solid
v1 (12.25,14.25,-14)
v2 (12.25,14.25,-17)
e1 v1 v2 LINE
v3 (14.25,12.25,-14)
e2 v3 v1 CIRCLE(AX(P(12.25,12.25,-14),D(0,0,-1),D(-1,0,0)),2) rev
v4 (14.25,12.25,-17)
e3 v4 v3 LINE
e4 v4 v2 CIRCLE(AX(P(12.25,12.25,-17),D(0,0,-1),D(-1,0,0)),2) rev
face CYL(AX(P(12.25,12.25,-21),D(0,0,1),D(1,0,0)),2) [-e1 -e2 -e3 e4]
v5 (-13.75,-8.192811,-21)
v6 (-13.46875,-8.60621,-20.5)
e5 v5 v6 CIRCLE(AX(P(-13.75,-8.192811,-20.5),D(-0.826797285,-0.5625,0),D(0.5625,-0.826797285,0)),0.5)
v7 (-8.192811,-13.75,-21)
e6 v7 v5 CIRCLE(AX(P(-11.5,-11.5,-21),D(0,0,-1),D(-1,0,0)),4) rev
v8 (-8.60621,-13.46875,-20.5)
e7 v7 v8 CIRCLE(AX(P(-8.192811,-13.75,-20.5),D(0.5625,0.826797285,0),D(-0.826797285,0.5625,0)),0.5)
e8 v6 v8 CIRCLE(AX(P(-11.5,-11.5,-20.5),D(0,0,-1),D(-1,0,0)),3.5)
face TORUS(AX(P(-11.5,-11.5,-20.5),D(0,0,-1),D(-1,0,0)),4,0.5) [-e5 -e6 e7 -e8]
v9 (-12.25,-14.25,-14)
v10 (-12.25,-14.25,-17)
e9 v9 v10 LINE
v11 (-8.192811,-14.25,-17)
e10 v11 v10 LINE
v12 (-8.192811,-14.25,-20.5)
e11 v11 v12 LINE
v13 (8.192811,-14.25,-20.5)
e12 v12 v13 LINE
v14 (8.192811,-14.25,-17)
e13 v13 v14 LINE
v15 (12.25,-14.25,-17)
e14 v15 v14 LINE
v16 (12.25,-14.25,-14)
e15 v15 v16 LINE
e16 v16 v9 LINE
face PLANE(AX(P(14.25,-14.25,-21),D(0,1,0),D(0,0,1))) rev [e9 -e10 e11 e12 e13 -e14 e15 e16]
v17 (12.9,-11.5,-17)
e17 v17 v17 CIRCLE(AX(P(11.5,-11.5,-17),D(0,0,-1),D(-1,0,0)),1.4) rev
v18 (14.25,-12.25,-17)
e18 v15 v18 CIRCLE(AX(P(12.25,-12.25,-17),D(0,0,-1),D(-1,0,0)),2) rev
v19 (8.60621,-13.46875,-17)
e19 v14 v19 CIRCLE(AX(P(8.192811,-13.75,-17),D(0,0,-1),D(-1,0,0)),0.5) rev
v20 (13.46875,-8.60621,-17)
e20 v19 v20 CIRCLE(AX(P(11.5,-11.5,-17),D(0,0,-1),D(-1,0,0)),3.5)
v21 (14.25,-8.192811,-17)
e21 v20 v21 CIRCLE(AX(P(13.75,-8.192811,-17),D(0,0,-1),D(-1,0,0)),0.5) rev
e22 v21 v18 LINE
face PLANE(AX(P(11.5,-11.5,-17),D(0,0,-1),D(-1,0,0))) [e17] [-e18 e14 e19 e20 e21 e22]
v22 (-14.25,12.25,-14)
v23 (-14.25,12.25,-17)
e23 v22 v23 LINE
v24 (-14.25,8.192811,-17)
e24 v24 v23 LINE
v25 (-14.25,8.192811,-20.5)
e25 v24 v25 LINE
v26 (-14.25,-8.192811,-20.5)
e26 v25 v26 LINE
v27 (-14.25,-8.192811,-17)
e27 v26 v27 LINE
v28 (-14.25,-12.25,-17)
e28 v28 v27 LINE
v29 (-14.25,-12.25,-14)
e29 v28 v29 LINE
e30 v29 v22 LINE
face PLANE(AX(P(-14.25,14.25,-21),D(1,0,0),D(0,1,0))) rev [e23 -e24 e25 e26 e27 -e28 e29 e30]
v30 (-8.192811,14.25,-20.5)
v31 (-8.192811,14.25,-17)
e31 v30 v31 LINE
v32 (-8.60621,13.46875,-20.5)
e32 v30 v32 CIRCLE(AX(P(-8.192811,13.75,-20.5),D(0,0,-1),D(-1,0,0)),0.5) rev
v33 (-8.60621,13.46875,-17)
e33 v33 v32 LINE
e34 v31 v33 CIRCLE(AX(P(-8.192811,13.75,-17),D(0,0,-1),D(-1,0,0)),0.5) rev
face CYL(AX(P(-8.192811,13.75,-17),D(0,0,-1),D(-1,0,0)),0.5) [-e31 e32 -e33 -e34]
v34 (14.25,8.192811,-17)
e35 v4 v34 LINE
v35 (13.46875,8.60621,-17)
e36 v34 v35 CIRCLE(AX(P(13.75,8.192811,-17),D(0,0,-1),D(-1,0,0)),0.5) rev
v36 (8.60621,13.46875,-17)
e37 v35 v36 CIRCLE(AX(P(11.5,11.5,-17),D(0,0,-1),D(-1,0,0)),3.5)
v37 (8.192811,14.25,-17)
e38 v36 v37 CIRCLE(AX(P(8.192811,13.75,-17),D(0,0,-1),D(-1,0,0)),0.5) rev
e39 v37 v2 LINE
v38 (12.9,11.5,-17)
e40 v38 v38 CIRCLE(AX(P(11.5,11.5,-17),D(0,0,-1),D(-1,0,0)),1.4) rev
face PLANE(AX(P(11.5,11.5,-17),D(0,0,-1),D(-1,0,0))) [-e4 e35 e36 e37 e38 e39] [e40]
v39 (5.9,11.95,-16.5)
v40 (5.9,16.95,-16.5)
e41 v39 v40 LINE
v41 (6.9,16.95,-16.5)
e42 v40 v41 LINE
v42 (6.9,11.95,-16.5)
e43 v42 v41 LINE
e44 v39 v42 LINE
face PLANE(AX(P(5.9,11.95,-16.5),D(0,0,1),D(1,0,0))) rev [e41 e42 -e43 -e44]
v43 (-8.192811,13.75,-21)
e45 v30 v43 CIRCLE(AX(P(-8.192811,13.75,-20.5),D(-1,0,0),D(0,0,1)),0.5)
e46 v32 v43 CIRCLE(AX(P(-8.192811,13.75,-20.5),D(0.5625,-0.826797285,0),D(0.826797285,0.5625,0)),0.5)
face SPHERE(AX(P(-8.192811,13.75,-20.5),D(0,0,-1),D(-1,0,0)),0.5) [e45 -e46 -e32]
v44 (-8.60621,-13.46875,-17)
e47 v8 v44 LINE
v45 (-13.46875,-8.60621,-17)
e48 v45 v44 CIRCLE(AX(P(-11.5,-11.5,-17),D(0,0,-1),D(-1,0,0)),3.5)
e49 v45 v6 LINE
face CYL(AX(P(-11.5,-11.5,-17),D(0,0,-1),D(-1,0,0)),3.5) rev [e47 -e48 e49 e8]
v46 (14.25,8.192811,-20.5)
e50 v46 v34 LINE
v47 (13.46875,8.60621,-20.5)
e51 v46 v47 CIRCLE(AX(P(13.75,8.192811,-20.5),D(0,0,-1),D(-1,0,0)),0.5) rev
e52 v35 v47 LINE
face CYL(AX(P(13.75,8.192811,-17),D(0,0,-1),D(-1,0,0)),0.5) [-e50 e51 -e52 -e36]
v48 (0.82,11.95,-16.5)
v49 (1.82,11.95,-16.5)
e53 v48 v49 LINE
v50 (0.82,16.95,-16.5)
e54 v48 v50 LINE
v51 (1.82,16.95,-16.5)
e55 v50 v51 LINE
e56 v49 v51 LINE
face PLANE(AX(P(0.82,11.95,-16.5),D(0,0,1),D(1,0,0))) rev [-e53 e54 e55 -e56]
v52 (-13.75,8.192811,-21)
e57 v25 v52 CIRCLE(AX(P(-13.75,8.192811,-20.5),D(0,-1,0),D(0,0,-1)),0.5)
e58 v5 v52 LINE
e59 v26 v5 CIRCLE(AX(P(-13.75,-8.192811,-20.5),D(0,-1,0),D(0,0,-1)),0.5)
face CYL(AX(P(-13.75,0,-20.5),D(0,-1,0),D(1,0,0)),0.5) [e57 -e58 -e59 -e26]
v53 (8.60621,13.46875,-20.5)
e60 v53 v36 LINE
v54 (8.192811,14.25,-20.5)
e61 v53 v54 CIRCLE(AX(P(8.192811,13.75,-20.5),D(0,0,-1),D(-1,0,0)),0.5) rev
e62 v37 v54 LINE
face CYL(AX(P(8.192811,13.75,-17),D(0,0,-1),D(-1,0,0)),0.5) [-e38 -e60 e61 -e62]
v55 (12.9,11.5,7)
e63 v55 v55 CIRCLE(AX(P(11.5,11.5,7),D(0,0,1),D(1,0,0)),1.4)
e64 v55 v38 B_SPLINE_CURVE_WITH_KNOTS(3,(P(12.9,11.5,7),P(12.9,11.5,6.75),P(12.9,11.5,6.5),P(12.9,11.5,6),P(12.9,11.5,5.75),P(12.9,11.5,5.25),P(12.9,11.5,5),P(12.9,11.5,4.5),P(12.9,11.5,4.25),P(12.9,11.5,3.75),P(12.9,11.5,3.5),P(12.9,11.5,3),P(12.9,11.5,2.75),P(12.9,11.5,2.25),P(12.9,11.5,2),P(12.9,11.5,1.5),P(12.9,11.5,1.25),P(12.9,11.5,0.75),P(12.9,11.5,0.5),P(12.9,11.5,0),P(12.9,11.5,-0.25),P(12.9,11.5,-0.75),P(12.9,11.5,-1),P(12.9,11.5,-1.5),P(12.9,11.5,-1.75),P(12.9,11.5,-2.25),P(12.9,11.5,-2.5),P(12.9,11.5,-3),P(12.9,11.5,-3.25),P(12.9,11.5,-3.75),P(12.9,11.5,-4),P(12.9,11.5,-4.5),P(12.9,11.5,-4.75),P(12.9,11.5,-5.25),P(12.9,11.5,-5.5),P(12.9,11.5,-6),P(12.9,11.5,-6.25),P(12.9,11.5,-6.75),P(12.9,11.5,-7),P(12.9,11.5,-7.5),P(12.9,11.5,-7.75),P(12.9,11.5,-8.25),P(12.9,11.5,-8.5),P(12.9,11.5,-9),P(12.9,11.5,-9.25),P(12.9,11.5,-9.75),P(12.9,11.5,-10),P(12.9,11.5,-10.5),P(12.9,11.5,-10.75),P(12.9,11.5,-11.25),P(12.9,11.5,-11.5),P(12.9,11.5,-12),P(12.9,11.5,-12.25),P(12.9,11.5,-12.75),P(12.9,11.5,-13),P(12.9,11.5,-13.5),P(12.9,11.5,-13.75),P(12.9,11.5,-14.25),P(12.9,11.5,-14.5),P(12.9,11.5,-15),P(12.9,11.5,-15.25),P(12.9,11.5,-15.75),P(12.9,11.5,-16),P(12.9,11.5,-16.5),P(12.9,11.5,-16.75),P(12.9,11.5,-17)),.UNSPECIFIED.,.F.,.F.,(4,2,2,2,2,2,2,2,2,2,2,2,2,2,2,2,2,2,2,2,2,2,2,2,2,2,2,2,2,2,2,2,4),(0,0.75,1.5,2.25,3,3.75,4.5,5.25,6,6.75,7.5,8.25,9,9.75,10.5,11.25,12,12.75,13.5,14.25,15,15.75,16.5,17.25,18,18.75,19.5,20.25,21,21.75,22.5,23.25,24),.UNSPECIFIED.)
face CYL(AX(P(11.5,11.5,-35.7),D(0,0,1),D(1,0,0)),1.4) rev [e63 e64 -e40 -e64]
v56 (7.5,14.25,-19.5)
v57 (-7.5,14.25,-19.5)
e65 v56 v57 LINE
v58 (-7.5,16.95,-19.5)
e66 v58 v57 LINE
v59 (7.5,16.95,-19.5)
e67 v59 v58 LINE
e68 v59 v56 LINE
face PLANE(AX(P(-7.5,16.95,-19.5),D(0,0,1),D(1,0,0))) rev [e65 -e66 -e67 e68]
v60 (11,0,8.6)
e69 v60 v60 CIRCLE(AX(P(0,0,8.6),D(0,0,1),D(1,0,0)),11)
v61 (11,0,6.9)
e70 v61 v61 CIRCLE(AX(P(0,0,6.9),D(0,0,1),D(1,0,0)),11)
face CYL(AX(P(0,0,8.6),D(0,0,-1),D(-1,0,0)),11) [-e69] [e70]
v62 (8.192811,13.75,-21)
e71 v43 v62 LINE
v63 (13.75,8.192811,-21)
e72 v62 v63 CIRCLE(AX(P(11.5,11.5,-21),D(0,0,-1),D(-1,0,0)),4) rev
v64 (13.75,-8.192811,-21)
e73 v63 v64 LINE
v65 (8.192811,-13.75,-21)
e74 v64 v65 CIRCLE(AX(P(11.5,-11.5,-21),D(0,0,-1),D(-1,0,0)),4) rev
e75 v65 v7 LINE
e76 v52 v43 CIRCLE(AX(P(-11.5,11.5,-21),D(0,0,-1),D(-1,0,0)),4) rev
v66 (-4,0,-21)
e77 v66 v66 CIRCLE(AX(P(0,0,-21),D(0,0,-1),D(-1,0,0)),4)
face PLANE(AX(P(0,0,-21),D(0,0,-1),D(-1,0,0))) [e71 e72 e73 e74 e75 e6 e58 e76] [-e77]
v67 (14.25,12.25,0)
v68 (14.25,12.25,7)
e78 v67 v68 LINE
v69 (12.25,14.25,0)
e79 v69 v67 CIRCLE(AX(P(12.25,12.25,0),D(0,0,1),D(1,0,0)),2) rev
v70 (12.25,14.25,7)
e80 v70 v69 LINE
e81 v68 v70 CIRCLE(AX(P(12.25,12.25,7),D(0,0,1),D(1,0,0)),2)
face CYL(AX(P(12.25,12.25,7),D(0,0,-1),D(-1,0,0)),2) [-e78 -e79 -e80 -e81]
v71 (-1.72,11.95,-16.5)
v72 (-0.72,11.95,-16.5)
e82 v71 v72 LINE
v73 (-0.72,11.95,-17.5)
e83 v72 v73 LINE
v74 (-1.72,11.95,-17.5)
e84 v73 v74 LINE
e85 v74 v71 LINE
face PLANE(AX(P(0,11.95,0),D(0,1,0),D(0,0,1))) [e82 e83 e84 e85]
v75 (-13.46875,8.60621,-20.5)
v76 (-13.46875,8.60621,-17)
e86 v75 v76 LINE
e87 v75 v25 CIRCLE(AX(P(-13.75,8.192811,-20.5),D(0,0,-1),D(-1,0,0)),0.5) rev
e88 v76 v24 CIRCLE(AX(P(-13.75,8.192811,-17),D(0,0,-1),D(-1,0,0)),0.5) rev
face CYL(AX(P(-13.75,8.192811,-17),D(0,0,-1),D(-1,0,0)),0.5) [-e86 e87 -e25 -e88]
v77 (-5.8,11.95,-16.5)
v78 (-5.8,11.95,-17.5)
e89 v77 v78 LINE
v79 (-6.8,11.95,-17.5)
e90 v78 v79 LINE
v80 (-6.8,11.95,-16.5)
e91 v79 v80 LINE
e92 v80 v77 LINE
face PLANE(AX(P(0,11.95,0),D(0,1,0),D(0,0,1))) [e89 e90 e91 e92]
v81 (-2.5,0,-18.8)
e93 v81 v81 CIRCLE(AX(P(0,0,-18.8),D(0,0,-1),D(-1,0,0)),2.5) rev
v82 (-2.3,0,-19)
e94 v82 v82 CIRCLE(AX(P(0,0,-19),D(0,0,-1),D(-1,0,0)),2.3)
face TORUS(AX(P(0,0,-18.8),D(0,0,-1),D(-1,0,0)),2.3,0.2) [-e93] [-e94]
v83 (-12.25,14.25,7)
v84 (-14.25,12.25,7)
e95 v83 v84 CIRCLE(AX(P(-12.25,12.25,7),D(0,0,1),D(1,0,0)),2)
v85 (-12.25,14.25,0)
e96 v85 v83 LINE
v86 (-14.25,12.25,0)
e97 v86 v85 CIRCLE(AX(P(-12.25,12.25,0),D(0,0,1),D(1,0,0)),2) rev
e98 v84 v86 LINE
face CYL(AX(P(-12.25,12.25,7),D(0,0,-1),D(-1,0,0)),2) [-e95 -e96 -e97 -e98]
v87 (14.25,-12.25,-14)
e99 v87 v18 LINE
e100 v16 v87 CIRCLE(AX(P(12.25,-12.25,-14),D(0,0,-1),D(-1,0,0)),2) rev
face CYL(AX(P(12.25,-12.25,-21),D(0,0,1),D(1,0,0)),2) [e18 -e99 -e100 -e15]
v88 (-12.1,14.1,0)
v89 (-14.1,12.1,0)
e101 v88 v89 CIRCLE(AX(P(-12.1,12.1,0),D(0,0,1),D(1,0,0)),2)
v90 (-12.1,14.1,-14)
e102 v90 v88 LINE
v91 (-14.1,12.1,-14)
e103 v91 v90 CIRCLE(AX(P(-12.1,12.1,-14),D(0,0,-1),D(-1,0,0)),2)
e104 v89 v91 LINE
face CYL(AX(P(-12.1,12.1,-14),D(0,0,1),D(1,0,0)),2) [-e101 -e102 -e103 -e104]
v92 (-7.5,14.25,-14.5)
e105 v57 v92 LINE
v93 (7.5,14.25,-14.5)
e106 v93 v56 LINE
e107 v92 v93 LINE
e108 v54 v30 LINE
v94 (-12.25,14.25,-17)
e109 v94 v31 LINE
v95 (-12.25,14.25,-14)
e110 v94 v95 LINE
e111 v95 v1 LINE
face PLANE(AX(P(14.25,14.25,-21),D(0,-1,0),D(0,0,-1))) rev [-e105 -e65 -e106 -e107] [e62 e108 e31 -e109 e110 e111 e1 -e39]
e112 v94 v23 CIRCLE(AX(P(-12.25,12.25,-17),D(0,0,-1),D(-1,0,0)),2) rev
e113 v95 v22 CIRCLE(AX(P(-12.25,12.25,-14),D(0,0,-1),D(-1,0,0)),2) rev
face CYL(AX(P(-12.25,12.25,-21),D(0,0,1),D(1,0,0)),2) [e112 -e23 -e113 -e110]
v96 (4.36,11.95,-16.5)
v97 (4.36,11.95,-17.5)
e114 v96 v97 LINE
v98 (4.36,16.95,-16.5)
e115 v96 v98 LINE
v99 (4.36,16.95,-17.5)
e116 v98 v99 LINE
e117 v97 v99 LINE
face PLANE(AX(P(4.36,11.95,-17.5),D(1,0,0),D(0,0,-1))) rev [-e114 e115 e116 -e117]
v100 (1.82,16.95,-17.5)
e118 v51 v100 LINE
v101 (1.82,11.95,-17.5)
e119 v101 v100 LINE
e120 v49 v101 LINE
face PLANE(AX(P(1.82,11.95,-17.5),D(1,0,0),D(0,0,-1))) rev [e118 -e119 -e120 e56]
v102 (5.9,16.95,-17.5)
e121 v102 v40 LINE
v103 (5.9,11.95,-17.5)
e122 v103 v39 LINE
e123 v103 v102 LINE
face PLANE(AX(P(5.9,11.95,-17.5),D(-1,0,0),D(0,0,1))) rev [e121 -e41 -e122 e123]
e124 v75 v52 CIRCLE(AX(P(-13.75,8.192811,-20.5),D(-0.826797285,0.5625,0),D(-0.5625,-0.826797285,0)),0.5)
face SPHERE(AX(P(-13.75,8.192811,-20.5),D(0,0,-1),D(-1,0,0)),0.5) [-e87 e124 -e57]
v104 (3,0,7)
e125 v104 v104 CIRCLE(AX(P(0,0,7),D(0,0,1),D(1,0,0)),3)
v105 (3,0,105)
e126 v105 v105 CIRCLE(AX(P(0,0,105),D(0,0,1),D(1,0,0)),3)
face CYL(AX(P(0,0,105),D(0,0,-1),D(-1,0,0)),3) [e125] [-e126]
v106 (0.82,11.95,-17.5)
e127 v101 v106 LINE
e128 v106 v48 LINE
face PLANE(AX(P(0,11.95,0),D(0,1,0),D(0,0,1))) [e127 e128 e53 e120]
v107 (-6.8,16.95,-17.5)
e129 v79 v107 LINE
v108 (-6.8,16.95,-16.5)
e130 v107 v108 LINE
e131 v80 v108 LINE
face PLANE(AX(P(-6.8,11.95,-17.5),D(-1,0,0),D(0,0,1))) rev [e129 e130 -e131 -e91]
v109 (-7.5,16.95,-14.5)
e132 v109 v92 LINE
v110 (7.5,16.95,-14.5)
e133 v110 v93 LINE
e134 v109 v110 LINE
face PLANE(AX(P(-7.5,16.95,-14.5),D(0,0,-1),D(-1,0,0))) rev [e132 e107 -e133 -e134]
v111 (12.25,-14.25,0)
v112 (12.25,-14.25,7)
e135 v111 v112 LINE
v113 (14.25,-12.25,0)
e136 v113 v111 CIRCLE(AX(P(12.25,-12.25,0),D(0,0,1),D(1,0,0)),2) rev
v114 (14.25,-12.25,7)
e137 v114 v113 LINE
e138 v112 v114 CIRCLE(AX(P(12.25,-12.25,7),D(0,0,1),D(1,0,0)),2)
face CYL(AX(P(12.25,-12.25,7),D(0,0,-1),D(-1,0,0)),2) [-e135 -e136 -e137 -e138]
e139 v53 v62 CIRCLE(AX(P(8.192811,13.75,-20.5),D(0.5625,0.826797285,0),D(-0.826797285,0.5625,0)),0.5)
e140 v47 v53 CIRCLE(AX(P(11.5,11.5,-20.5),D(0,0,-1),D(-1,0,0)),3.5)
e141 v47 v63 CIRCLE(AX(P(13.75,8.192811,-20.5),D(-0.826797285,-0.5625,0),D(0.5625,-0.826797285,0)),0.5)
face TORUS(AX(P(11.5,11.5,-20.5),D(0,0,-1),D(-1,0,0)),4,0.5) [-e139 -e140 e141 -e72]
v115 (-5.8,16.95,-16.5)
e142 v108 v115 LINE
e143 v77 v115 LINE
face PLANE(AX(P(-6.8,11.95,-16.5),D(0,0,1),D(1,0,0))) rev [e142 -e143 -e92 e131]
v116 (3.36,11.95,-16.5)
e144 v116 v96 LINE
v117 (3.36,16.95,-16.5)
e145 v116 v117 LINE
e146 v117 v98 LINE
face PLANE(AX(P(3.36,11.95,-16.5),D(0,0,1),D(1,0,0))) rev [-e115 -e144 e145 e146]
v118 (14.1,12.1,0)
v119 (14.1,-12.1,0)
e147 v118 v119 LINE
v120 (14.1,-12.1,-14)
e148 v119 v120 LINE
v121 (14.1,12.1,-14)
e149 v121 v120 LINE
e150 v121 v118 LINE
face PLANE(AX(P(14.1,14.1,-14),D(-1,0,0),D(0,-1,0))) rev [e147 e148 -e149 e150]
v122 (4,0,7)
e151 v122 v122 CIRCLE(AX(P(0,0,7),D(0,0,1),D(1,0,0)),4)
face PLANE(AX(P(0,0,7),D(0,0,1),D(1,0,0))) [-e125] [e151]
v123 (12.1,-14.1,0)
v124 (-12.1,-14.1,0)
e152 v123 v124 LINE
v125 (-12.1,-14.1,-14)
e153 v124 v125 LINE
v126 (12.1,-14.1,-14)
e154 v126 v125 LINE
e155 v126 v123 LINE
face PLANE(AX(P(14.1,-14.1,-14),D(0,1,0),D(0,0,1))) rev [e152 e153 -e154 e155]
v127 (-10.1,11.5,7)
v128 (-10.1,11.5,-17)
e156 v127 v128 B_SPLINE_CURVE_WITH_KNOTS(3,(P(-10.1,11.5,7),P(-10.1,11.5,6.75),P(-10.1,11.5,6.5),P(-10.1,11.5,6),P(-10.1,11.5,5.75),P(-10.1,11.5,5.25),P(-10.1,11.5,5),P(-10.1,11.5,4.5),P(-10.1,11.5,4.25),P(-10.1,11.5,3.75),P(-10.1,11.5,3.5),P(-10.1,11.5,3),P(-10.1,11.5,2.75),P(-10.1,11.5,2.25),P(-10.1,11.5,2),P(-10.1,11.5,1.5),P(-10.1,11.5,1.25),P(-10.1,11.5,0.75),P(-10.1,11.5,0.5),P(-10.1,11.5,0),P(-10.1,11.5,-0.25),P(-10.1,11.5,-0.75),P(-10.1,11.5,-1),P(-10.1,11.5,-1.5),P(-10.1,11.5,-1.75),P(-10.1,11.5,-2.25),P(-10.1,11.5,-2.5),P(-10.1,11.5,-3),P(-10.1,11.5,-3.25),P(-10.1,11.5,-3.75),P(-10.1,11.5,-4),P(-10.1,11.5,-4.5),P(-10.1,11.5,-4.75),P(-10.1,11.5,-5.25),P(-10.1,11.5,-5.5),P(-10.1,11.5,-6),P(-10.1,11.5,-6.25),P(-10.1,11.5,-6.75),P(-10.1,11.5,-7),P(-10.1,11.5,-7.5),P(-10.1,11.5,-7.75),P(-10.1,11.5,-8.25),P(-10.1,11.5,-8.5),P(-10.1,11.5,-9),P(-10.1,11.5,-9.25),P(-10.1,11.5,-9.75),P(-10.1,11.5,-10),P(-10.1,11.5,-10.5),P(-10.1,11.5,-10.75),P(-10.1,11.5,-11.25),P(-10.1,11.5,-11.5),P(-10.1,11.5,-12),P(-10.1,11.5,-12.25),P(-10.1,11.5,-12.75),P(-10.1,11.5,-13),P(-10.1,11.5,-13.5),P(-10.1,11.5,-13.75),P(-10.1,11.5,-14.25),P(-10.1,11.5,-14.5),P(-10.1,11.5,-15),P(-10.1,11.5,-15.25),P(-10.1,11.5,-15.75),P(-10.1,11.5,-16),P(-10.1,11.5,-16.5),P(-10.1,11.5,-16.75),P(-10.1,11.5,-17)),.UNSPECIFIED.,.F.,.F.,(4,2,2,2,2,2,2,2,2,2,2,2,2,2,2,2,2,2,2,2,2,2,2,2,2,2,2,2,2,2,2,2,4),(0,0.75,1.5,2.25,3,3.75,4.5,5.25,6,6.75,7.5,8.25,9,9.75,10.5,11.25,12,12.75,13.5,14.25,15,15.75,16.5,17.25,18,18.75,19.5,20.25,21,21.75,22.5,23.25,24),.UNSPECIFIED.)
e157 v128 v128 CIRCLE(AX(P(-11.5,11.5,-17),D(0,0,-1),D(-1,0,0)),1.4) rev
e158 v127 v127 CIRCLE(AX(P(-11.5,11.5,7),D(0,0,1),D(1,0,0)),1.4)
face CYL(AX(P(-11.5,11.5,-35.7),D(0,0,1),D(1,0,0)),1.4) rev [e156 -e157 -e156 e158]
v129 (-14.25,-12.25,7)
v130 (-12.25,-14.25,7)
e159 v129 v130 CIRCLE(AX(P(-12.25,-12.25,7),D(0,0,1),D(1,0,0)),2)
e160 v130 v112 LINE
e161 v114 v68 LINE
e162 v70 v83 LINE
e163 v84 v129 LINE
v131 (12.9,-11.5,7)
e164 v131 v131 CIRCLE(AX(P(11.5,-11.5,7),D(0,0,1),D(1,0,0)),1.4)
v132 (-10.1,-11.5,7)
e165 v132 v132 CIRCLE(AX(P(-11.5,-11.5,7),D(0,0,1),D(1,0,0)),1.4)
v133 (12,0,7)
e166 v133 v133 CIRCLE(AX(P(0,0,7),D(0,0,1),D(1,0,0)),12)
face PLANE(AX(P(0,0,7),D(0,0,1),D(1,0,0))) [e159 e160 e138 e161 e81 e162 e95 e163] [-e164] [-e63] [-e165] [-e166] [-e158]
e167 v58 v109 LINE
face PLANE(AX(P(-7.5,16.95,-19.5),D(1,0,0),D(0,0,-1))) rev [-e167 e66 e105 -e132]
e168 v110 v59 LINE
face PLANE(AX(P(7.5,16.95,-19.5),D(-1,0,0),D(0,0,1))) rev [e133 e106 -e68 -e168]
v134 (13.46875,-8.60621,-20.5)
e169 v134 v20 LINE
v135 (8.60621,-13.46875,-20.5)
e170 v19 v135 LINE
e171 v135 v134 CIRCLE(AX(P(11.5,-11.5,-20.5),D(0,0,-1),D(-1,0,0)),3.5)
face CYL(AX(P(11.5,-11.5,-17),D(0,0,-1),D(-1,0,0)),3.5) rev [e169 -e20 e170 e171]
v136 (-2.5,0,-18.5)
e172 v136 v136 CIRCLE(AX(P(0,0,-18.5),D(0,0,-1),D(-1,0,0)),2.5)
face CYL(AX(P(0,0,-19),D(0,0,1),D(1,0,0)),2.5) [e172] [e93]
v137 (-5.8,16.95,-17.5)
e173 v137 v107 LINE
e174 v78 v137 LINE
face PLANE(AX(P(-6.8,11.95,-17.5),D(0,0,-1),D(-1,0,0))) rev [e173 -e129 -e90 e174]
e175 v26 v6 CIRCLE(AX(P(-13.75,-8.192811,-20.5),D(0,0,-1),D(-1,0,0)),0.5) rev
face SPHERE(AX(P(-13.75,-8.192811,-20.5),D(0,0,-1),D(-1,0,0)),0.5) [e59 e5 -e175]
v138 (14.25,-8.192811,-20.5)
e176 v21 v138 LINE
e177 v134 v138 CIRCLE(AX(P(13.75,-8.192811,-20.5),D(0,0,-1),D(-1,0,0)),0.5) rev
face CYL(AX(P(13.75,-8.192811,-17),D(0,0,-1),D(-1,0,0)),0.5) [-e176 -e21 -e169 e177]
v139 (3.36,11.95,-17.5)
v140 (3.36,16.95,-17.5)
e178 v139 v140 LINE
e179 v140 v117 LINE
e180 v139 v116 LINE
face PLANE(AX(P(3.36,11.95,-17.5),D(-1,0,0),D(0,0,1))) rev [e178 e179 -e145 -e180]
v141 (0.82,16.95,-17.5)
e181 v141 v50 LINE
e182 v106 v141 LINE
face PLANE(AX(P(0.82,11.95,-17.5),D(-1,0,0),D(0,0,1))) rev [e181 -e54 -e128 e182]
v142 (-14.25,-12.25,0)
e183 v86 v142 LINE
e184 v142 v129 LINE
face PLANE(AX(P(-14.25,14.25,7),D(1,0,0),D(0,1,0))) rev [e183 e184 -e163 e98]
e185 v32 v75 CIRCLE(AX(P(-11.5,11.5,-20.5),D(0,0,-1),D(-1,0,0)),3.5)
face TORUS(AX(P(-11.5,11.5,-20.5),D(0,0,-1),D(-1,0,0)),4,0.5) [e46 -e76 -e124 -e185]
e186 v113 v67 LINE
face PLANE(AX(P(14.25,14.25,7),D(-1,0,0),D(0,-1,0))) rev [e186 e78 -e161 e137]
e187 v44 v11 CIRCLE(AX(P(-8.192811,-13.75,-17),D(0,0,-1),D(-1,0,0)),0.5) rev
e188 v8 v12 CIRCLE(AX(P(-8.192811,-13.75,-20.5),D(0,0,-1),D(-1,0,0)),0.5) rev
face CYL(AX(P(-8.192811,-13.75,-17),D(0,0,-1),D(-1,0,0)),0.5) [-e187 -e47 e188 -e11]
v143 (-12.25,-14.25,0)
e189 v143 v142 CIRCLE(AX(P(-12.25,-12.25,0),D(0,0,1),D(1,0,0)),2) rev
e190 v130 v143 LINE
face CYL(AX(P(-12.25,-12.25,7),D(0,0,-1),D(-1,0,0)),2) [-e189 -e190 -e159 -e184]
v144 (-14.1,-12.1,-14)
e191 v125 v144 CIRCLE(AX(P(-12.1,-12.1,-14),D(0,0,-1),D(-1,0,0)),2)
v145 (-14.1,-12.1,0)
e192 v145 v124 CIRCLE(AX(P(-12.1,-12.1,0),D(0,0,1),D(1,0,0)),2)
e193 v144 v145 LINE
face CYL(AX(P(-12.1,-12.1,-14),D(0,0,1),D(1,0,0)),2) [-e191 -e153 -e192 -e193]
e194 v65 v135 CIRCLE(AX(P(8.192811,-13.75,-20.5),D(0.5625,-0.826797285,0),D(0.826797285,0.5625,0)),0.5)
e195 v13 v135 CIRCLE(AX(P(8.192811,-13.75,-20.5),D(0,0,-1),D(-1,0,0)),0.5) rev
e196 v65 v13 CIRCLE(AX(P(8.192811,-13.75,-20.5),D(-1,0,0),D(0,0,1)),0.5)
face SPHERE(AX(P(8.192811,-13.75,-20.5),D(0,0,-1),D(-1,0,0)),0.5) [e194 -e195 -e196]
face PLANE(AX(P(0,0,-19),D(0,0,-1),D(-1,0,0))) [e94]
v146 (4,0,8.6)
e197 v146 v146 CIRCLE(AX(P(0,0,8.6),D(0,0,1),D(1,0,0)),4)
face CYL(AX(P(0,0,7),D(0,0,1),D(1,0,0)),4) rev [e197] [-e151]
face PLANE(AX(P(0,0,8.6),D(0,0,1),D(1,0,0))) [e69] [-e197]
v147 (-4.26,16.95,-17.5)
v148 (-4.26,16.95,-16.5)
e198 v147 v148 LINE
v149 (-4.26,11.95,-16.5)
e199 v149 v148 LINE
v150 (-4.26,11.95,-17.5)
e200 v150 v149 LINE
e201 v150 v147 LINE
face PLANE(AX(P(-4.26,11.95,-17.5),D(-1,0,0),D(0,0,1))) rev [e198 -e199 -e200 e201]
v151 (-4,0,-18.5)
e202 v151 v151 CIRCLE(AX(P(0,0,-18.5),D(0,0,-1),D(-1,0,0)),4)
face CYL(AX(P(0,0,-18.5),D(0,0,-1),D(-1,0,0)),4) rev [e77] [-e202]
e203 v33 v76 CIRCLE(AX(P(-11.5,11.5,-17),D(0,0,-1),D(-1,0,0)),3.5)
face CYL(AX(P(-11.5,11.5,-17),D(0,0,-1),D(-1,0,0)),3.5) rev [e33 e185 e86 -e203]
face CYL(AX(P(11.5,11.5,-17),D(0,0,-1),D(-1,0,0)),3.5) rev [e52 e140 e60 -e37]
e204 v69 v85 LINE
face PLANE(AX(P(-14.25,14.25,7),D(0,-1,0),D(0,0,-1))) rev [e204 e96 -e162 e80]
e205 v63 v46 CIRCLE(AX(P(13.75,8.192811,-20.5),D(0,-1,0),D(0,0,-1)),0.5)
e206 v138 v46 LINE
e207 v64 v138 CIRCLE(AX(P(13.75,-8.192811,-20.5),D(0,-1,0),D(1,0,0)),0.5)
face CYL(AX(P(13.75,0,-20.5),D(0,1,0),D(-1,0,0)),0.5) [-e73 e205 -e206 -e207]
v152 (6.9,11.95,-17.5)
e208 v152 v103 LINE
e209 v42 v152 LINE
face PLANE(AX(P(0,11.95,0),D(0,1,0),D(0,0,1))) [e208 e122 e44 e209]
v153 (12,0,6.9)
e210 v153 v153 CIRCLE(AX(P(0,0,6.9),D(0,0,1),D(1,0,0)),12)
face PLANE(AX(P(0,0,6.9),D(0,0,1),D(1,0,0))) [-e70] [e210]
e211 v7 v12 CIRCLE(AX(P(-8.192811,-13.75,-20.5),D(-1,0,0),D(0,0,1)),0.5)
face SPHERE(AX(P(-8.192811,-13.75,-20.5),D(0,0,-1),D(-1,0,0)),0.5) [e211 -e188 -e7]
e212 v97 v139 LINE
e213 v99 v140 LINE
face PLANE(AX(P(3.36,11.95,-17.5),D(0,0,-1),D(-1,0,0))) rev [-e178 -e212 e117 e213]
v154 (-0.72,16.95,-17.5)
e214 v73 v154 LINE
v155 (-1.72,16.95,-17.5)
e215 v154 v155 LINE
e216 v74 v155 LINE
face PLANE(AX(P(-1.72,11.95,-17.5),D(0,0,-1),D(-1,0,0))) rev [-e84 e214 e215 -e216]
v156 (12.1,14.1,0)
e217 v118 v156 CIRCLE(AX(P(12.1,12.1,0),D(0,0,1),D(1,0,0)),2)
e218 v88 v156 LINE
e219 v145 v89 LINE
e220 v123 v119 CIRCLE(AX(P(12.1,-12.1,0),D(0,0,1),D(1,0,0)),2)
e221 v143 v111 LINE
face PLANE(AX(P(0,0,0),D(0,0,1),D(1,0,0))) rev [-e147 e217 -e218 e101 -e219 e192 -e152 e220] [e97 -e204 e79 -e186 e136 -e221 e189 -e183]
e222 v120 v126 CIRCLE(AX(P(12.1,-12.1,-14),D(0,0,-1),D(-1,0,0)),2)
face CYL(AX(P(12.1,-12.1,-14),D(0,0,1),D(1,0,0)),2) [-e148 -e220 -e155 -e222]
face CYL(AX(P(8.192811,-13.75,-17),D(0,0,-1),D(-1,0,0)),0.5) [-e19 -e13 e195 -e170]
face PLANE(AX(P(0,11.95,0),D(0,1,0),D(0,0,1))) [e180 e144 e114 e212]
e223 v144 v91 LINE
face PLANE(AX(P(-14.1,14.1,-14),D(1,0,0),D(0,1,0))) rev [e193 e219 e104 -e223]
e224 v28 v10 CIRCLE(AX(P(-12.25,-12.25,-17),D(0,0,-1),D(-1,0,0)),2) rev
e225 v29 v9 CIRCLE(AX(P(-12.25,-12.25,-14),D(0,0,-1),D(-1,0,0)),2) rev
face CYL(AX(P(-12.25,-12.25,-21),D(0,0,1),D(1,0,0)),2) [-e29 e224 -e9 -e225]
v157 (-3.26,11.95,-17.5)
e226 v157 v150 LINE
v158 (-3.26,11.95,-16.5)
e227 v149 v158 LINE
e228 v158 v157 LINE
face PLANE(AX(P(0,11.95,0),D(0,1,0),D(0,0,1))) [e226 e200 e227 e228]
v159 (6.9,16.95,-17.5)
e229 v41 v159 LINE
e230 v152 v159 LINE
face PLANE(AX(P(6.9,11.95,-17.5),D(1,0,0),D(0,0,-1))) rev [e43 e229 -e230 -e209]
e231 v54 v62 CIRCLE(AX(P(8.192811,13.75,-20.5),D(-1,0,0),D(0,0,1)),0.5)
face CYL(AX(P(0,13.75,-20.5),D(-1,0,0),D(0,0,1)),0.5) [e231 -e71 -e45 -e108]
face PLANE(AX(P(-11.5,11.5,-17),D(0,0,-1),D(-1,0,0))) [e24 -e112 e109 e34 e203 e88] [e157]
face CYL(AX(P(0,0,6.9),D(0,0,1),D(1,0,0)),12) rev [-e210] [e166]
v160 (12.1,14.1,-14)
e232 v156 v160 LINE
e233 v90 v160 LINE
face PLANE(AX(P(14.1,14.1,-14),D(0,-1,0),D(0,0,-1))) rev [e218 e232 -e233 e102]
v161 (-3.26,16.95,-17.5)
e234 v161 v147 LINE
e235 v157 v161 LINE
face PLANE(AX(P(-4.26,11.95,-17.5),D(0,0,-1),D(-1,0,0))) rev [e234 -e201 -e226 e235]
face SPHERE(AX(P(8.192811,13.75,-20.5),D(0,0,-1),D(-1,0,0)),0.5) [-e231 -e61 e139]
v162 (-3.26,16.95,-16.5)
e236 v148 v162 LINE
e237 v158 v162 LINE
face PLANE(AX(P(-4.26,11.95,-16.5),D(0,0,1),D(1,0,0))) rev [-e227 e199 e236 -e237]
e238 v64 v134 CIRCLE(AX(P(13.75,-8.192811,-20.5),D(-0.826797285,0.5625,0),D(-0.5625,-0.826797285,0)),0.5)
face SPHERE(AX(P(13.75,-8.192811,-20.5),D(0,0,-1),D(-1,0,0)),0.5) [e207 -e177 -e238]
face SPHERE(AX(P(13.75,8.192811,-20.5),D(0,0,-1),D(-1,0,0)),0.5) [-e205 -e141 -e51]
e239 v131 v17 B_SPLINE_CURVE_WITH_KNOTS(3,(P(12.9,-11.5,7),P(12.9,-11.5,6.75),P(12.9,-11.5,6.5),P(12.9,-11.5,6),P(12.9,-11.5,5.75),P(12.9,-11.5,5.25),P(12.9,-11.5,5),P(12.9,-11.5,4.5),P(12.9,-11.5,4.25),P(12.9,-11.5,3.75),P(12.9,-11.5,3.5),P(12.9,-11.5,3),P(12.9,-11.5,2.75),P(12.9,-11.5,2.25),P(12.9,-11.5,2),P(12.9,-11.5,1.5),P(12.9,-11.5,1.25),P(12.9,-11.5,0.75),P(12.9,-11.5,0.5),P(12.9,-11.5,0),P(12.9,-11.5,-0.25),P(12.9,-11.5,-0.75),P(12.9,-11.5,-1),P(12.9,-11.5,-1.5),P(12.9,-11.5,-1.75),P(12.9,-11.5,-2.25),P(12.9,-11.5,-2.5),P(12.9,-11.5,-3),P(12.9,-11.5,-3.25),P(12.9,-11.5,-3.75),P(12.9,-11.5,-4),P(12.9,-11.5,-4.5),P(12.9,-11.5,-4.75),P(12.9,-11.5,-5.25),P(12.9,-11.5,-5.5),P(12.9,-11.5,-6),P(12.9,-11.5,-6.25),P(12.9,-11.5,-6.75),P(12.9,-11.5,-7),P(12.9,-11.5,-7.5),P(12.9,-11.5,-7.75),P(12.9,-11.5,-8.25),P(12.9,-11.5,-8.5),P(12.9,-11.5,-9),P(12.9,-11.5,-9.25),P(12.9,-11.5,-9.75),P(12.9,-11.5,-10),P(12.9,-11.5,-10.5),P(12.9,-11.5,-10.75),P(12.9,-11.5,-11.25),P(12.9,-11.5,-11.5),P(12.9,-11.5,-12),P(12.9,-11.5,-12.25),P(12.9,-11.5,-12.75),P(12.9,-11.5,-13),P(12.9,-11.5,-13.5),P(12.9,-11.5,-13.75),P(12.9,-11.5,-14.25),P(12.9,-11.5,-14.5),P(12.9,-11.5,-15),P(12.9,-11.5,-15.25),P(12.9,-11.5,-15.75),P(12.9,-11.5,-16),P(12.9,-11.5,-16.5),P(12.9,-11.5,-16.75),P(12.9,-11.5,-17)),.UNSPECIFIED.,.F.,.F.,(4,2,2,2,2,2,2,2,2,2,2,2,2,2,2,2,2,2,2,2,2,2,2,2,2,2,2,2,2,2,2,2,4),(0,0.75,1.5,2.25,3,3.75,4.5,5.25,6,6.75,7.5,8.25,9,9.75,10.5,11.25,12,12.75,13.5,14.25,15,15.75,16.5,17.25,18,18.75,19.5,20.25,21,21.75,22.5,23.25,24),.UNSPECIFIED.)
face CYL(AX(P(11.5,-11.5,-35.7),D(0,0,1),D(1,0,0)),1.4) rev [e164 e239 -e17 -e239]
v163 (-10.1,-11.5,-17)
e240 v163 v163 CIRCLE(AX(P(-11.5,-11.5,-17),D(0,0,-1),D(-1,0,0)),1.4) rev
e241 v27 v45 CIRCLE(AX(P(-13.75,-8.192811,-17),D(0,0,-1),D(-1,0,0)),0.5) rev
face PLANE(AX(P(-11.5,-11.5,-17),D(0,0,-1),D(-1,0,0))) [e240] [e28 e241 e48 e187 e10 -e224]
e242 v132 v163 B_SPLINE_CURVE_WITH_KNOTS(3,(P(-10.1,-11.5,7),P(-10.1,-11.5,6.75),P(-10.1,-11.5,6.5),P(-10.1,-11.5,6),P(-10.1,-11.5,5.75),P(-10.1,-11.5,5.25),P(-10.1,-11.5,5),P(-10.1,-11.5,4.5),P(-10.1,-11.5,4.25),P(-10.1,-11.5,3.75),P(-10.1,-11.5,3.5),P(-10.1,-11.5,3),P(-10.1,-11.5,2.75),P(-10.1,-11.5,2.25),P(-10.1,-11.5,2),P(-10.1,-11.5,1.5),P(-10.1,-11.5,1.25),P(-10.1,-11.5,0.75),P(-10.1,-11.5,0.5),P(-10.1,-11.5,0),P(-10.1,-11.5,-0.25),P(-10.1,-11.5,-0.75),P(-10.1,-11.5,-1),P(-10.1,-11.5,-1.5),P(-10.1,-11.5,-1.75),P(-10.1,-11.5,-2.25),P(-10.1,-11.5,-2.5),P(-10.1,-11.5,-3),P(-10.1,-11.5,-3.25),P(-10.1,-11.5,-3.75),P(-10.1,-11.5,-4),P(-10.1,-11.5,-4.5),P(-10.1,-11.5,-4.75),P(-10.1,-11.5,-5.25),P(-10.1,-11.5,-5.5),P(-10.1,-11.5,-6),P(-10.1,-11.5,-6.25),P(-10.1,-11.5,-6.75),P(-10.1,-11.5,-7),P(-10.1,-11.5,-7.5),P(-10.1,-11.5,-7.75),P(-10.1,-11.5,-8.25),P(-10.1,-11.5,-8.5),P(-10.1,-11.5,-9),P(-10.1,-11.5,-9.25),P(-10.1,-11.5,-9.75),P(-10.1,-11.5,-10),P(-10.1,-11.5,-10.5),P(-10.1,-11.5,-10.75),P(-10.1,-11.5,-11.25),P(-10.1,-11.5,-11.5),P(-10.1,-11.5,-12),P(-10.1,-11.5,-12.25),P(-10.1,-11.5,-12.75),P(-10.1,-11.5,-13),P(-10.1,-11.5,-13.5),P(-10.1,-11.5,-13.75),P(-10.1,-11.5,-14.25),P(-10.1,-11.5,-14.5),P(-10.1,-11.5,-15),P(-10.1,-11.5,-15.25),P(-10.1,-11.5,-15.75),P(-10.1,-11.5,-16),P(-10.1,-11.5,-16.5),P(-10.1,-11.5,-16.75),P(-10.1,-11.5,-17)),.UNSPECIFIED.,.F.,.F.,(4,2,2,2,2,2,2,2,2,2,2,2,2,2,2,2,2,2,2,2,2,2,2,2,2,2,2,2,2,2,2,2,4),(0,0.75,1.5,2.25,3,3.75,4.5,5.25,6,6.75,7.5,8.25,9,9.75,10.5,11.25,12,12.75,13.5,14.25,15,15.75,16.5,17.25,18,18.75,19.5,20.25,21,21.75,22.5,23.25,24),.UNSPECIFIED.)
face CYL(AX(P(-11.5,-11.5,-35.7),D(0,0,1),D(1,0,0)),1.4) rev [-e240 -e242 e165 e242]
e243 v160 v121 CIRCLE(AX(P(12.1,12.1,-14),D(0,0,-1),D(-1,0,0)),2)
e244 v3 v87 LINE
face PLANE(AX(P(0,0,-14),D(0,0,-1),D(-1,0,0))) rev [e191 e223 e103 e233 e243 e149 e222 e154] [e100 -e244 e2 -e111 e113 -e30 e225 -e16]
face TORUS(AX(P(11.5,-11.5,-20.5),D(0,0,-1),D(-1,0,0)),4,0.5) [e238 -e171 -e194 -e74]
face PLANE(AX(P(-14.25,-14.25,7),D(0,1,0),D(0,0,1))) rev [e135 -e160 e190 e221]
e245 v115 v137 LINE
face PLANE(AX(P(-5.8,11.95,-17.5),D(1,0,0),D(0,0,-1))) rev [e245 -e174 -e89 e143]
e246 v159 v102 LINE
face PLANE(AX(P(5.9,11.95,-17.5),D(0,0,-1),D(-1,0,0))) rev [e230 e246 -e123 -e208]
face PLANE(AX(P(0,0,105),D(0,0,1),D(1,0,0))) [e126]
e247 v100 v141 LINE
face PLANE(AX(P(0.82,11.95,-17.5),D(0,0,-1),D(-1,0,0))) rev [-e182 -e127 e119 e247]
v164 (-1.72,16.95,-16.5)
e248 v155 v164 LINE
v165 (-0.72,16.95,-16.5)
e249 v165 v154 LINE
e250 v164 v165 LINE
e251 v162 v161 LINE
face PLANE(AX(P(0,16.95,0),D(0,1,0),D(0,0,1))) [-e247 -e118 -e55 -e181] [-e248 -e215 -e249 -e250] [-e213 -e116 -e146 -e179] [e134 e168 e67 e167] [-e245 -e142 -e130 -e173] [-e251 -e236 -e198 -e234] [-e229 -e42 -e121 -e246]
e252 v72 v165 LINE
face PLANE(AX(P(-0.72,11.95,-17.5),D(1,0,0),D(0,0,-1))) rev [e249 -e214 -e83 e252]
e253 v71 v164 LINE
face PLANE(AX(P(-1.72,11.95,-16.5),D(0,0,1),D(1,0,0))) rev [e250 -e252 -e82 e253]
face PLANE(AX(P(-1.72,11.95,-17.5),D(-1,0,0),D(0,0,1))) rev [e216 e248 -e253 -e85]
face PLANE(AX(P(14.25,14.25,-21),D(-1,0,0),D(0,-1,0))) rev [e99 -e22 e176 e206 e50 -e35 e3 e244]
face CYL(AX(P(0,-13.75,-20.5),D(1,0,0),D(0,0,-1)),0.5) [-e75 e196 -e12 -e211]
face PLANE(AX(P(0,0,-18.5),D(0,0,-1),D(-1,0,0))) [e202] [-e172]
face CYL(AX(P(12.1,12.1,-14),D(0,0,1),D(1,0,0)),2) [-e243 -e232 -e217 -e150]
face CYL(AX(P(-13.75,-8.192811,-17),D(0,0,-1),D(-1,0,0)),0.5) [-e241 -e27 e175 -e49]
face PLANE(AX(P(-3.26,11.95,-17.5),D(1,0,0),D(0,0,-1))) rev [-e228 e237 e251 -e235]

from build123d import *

# Parameters (mm, degrees)
SKETCH1_W           = 28.5
SKETCH1_H           = 28.5
BOSS_EXTRUDE1_DEPTH = 7
FILLET1_R           = 2
SKETCH2_R           = 11
BOSS_EXTRUDE2_DEPTH = 1.6
SKETCH3_R           = 4
CUT_EXTRUDE1_DEPTH  = 1.6
SKETCH6_W           = 28.2
SKETCH6_H           = 28.2
BOSS_EXTRUDE4_DEPTH = 14
FILLET2_R           = 2
SKETCH7_W           = 28.5
SKETCH7_H           = 28.5
BOSS_EXTRUDE5_DEPTH = 7
FILLET3_R           = 2
SKETCH8_W           = 15
SKETCH8_H           = 5
BOSS_EXTRUDE6_DEPTH = 2.7
SKETCH9_R           = 1.4
CUT_EXTRUDE3_DEPTH  = 42.7
SKETCH10_R          = 3.5
CUT_EXTRUDE4_DEPTH  = 4
FILLET4_R           = 0.5
FILLET5_R           = 0.5
CUT_EXTRUDE5_START  = -0.1
SKETCH11_R          = 12
SKETCH11_R_2        = 11
CUT_EXTRUDE5_DEPTH  = 0.1
CUT_EXTRUDE6_START  = -2.5
SKETCH12_R          = 4
CUT_EXTRUDE6_DEPTH  = 2.5
SKETCH13_R          = 2.5
BOSS_EXTRUDE7_DEPTH = 0.5
FILLET6_R           = 0.2
SKETCH14_W          = 1
SKETCH14_H          = 1
CUT_EXTRUDE7_DEPTH  = 5
SKETCH_1_R          = 3
SHAFT_DEPTH         = 98


with BuildPart() as part:
    # Sketch1 → Boss-Extrude1 (new body)
    with BuildSketch(Plane.XY):
        Rectangle(SKETCH1_W, SKETCH1_H)
    extrude(amount=BOSS_EXTRUDE1_DEPTH)

    # Fillet1
    fillet1_edges = [part.edges().sort_by_distance(p)[0] for p in [
        (14.25, -14.25, 3.5),
        (-14.25, -14.25, 3.5),
        (-14.25, 14.25, 3.5),
        (14.25, 14.25, 3.5),
    ]]
    fillet(fillet1_edges, radius=FILLET1_R)

    # Sketch2 → Boss-Extrude2 (add)
    with BuildSketch(Plane.XY.offset(7)):
        Circle(SKETCH2_R)
    extrude(amount=BOSS_EXTRUDE2_DEPTH)

    # Sketch3 → Cut-Extrude1 (cut)
    with BuildSketch(Plane.XY.offset(8.6)):
        Circle(SKETCH3_R)
    extrude(amount=-CUT_EXTRUDE1_DEPTH, mode=Mode.SUBTRACT)

    # Sketch6 → Boss-Extrude4 (add)
    with BuildSketch(Plane(origin=(0, 0, 0), x_dir=(-1, 0, 0), z_dir=(0, 0, -1))):
        Rectangle(SKETCH6_W, SKETCH6_H)
    extrude(amount=BOSS_EXTRUDE4_DEPTH)

    # Fillet2
    # the kernel refuses this fillet: 2 mm, written as the material it takes off along each edge
    with BuildSketch(Plane(origin=(-14.1, -14.1, 0), x_dir=(0, 1, 0), z_dir=(0, 0, -1)), Plane(origin=(-14.1, 14.1, 0), x_dir=(1, 0, 0), z_dir=(0, 0, -1))) as fillet2_piece_1:
        with BuildLine():
            CenterArc((FILLET2_R, FILLET2_R), FILLET2_R, 180, 90)
            Line((0, FILLET2_R), (0, 0))
            Line((0, 0), (FILLET2_R, 0))
        make_face()
    extrude(amount=19, mode=Mode.SUBTRACT)
    with BuildSketch(Plane(origin=(14.1, 14.1, 0), x_dir=(-1, 0, 0), z_dir=(0, 0, -1)), Plane(origin=(14.1, -14.1, 0), x_dir=(0, 1, 0), z_dir=(0, 0, -1))) as fillet2_piece_2:
        with BuildLine():
            CenterArc((FILLET2_R, -FILLET2_R), FILLET2_R, 90, 90)
            Line((0, -FILLET2_R), (0, 0))
            Line((0, 0), (FILLET2_R, 0))
        make_face()
    extrude(amount=19, mode=Mode.SUBTRACT)

    # Sketch7 → Boss-Extrude5 (add)
    with BuildSketch(Plane(origin=(0, 0, -14), x_dir=(-1, 0, 0), z_dir=(0, 0, -1))):
        Rectangle(SKETCH7_W, SKETCH7_H)
    extrude(amount=BOSS_EXTRUDE5_DEPTH)

    # Fillet3
    fillet3_edges = [part.edges().sort_by_distance(p)[0] for p in [
        (-14.25, -14.25, -17.5),
        (-14.25, 14.25, -17.5),
        (14.25, 14.25, -17.5),
        (14.25, -14.25, -17.5),
    ]]
    fillet(fillet3_edges, radius=FILLET3_R)

    # Sketch8 → Boss-Extrude6 (add)
    with BuildSketch(Plane(origin=(0, 14.25, 0), x_dir=(1, 0, 0), z_dir=(0, 1, 0))):
        with Locations((0, 17)):
            Rectangle(SKETCH8_W, SKETCH8_H)
    extrude(amount=BOSS_EXTRUDE6_DEPTH)

    # Sketch9 → Cut-Extrude3 (cut)
    with BuildSketch(Plane.XY.offset(7)):
        with Locations((-11.5, 11.5)):
            Circle(SKETCH9_R)
        with Locations((11.5, 11.5)):
            Circle(SKETCH9_R)
        with Locations((11.5, -11.5)):
            Circle(SKETCH9_R)
        with Locations((-11.5, -11.5)):
            Circle(SKETCH9_R)
    extrude(amount=-CUT_EXTRUDE3_DEPTH, mode=Mode.SUBTRACT)

    # Sketch10 → Cut-Extrude4 (cut)
    with BuildSketch(Plane(origin=(0, 0, -21), x_dir=(-1, 0, 0), z_dir=(0, 0, -1))):
        with Locations((-11.5, 11.5)):
            Circle(SKETCH10_R)
        with Locations((11.5, 11.5)):
            Circle(SKETCH10_R)
        with Locations((11.5, -11.5)):
            Circle(SKETCH10_R)
        with Locations((-11.5, -11.5)):
            Circle(SKETCH10_R)
    extrude(amount=-CUT_EXTRUDE4_DEPTH, mode=Mode.SUBTRACT)

    # Fillet4
    fillet4_edges = [part.edges().sort_by_distance(p)[0] for p in [
        (14.25, -9.334936491, -19),
        (9.334936491, -14.25, -19),
        (-14.25, -9.334936491, -19),
        (-9.334936491, -14.25, -19),
        (-9.334936491, 14.25, -19),
        (-14.25, 9.334936491, -19),
        (9.334936491, 14.25, -19),
        (14.25, 9.334936491, -19),
    ]]
    fillet(fillet4_edges, radius=FILLET4_R)

    # Fillet5
    fillet5_edges = [part.edges().sort_by_distance(p)[0] for p in [
        (-14.25, 0, -21),
        (9.025126266, -9.025126266, -21),
        (0, -14.25, -21),
        (-9.025126266, -9.025126266, -21),
        (-9.025126266, 9.025126266, -21),
        (0, 14.25, -21),
        (9.025126266, 9.025126266, -21),
        (14.25, 0, -21),
        (13.983853587, 8.634752599, -21),
        (8.634752599, 13.983853587, -21),
        (13.983853587, -8.634752599, -21),
        (8.634752599, -13.983853587, -21),
        (-8.634752599, -13.983853587, -21),
        (-13.983853587, -8.634752599, -21),
        (-8.634752599, 13.983853587, -21),
        (-13.983853587, 8.634752599, -21),
    ]]
    fillet(fillet5_edges, radius=FILLET5_R)

    # Sketch11 → Cut-Extrude5 (cut)
    with BuildSketch(Plane.XY.offset(7).offset(CUT_EXTRUDE5_START)):
        Circle(SKETCH11_R)
        Circle(SKETCH11_R_2, mode=Mode.SUBTRACT)
    extrude(amount=CUT_EXTRUDE5_DEPTH, mode=Mode.SUBTRACT)

    # Sketch12 → Cut-Extrude6 (cut)
    with BuildSketch(Plane(origin=(0, 0, -21), x_dir=(-1, 0, 0), z_dir=(0, 0, -1)).offset(CUT_EXTRUDE6_START)):
        with Locations(Location((0, 0, 0), (0, 0, 180))):
            Circle(SKETCH12_R)
    extrude(amount=CUT_EXTRUDE6_DEPTH, mode=Mode.SUBTRACT)

    # Sketch13 → Boss-Extrude7 (add)
    with BuildSketch(Plane(origin=(0, 0, -18.5), x_dir=(-1, 0, 0), z_dir=(0, 0, -1))):
        Circle(SKETCH13_R)
    extrude(amount=BOSS_EXTRUDE7_DEPTH)

    # Fillet6
    fillet6_edges = [part.edges().sort_by_distance(p)[0] for p in [
        (2.5, 0, -19),
    ]]
    fillet(fillet6_edges, radius=FILLET6_R)

    # Sketch14 → Cut-Extrude7 (cut)
    with BuildSketch(Plane(origin=(0, 16.95, 0), x_dir=(1, 0, 0), z_dir=(0, 1, 0))):
        with Locations((-6.3, 17)):
            Rectangle(SKETCH14_W, SKETCH14_H)
        with Locations((-3.76, 17)):
            Rectangle(SKETCH14_W, SKETCH14_H)
        with Locations((-1.22, 17)):
            Rectangle(SKETCH14_W, SKETCH14_H)
        with Locations((1.32, 17)):
            Rectangle(SKETCH14_W, SKETCH14_H)
        with Locations((3.86, 17)):
            Rectangle(SKETCH14_W, SKETCH14_H)
        with Locations((6.4, 17)):
            Rectangle(SKETCH14_W, SKETCH14_H)
    extrude(amount=-CUT_EXTRUDE7_DEPTH, mode=Mode.SUBTRACT)

    # Эскиз1 → Shaft (add)
    with BuildSketch(Plane.XY.offset(7)):
        Circle(SKETCH_1_R)
    extrude(amount=SHAFT_DEPTH)


solid = part.part
